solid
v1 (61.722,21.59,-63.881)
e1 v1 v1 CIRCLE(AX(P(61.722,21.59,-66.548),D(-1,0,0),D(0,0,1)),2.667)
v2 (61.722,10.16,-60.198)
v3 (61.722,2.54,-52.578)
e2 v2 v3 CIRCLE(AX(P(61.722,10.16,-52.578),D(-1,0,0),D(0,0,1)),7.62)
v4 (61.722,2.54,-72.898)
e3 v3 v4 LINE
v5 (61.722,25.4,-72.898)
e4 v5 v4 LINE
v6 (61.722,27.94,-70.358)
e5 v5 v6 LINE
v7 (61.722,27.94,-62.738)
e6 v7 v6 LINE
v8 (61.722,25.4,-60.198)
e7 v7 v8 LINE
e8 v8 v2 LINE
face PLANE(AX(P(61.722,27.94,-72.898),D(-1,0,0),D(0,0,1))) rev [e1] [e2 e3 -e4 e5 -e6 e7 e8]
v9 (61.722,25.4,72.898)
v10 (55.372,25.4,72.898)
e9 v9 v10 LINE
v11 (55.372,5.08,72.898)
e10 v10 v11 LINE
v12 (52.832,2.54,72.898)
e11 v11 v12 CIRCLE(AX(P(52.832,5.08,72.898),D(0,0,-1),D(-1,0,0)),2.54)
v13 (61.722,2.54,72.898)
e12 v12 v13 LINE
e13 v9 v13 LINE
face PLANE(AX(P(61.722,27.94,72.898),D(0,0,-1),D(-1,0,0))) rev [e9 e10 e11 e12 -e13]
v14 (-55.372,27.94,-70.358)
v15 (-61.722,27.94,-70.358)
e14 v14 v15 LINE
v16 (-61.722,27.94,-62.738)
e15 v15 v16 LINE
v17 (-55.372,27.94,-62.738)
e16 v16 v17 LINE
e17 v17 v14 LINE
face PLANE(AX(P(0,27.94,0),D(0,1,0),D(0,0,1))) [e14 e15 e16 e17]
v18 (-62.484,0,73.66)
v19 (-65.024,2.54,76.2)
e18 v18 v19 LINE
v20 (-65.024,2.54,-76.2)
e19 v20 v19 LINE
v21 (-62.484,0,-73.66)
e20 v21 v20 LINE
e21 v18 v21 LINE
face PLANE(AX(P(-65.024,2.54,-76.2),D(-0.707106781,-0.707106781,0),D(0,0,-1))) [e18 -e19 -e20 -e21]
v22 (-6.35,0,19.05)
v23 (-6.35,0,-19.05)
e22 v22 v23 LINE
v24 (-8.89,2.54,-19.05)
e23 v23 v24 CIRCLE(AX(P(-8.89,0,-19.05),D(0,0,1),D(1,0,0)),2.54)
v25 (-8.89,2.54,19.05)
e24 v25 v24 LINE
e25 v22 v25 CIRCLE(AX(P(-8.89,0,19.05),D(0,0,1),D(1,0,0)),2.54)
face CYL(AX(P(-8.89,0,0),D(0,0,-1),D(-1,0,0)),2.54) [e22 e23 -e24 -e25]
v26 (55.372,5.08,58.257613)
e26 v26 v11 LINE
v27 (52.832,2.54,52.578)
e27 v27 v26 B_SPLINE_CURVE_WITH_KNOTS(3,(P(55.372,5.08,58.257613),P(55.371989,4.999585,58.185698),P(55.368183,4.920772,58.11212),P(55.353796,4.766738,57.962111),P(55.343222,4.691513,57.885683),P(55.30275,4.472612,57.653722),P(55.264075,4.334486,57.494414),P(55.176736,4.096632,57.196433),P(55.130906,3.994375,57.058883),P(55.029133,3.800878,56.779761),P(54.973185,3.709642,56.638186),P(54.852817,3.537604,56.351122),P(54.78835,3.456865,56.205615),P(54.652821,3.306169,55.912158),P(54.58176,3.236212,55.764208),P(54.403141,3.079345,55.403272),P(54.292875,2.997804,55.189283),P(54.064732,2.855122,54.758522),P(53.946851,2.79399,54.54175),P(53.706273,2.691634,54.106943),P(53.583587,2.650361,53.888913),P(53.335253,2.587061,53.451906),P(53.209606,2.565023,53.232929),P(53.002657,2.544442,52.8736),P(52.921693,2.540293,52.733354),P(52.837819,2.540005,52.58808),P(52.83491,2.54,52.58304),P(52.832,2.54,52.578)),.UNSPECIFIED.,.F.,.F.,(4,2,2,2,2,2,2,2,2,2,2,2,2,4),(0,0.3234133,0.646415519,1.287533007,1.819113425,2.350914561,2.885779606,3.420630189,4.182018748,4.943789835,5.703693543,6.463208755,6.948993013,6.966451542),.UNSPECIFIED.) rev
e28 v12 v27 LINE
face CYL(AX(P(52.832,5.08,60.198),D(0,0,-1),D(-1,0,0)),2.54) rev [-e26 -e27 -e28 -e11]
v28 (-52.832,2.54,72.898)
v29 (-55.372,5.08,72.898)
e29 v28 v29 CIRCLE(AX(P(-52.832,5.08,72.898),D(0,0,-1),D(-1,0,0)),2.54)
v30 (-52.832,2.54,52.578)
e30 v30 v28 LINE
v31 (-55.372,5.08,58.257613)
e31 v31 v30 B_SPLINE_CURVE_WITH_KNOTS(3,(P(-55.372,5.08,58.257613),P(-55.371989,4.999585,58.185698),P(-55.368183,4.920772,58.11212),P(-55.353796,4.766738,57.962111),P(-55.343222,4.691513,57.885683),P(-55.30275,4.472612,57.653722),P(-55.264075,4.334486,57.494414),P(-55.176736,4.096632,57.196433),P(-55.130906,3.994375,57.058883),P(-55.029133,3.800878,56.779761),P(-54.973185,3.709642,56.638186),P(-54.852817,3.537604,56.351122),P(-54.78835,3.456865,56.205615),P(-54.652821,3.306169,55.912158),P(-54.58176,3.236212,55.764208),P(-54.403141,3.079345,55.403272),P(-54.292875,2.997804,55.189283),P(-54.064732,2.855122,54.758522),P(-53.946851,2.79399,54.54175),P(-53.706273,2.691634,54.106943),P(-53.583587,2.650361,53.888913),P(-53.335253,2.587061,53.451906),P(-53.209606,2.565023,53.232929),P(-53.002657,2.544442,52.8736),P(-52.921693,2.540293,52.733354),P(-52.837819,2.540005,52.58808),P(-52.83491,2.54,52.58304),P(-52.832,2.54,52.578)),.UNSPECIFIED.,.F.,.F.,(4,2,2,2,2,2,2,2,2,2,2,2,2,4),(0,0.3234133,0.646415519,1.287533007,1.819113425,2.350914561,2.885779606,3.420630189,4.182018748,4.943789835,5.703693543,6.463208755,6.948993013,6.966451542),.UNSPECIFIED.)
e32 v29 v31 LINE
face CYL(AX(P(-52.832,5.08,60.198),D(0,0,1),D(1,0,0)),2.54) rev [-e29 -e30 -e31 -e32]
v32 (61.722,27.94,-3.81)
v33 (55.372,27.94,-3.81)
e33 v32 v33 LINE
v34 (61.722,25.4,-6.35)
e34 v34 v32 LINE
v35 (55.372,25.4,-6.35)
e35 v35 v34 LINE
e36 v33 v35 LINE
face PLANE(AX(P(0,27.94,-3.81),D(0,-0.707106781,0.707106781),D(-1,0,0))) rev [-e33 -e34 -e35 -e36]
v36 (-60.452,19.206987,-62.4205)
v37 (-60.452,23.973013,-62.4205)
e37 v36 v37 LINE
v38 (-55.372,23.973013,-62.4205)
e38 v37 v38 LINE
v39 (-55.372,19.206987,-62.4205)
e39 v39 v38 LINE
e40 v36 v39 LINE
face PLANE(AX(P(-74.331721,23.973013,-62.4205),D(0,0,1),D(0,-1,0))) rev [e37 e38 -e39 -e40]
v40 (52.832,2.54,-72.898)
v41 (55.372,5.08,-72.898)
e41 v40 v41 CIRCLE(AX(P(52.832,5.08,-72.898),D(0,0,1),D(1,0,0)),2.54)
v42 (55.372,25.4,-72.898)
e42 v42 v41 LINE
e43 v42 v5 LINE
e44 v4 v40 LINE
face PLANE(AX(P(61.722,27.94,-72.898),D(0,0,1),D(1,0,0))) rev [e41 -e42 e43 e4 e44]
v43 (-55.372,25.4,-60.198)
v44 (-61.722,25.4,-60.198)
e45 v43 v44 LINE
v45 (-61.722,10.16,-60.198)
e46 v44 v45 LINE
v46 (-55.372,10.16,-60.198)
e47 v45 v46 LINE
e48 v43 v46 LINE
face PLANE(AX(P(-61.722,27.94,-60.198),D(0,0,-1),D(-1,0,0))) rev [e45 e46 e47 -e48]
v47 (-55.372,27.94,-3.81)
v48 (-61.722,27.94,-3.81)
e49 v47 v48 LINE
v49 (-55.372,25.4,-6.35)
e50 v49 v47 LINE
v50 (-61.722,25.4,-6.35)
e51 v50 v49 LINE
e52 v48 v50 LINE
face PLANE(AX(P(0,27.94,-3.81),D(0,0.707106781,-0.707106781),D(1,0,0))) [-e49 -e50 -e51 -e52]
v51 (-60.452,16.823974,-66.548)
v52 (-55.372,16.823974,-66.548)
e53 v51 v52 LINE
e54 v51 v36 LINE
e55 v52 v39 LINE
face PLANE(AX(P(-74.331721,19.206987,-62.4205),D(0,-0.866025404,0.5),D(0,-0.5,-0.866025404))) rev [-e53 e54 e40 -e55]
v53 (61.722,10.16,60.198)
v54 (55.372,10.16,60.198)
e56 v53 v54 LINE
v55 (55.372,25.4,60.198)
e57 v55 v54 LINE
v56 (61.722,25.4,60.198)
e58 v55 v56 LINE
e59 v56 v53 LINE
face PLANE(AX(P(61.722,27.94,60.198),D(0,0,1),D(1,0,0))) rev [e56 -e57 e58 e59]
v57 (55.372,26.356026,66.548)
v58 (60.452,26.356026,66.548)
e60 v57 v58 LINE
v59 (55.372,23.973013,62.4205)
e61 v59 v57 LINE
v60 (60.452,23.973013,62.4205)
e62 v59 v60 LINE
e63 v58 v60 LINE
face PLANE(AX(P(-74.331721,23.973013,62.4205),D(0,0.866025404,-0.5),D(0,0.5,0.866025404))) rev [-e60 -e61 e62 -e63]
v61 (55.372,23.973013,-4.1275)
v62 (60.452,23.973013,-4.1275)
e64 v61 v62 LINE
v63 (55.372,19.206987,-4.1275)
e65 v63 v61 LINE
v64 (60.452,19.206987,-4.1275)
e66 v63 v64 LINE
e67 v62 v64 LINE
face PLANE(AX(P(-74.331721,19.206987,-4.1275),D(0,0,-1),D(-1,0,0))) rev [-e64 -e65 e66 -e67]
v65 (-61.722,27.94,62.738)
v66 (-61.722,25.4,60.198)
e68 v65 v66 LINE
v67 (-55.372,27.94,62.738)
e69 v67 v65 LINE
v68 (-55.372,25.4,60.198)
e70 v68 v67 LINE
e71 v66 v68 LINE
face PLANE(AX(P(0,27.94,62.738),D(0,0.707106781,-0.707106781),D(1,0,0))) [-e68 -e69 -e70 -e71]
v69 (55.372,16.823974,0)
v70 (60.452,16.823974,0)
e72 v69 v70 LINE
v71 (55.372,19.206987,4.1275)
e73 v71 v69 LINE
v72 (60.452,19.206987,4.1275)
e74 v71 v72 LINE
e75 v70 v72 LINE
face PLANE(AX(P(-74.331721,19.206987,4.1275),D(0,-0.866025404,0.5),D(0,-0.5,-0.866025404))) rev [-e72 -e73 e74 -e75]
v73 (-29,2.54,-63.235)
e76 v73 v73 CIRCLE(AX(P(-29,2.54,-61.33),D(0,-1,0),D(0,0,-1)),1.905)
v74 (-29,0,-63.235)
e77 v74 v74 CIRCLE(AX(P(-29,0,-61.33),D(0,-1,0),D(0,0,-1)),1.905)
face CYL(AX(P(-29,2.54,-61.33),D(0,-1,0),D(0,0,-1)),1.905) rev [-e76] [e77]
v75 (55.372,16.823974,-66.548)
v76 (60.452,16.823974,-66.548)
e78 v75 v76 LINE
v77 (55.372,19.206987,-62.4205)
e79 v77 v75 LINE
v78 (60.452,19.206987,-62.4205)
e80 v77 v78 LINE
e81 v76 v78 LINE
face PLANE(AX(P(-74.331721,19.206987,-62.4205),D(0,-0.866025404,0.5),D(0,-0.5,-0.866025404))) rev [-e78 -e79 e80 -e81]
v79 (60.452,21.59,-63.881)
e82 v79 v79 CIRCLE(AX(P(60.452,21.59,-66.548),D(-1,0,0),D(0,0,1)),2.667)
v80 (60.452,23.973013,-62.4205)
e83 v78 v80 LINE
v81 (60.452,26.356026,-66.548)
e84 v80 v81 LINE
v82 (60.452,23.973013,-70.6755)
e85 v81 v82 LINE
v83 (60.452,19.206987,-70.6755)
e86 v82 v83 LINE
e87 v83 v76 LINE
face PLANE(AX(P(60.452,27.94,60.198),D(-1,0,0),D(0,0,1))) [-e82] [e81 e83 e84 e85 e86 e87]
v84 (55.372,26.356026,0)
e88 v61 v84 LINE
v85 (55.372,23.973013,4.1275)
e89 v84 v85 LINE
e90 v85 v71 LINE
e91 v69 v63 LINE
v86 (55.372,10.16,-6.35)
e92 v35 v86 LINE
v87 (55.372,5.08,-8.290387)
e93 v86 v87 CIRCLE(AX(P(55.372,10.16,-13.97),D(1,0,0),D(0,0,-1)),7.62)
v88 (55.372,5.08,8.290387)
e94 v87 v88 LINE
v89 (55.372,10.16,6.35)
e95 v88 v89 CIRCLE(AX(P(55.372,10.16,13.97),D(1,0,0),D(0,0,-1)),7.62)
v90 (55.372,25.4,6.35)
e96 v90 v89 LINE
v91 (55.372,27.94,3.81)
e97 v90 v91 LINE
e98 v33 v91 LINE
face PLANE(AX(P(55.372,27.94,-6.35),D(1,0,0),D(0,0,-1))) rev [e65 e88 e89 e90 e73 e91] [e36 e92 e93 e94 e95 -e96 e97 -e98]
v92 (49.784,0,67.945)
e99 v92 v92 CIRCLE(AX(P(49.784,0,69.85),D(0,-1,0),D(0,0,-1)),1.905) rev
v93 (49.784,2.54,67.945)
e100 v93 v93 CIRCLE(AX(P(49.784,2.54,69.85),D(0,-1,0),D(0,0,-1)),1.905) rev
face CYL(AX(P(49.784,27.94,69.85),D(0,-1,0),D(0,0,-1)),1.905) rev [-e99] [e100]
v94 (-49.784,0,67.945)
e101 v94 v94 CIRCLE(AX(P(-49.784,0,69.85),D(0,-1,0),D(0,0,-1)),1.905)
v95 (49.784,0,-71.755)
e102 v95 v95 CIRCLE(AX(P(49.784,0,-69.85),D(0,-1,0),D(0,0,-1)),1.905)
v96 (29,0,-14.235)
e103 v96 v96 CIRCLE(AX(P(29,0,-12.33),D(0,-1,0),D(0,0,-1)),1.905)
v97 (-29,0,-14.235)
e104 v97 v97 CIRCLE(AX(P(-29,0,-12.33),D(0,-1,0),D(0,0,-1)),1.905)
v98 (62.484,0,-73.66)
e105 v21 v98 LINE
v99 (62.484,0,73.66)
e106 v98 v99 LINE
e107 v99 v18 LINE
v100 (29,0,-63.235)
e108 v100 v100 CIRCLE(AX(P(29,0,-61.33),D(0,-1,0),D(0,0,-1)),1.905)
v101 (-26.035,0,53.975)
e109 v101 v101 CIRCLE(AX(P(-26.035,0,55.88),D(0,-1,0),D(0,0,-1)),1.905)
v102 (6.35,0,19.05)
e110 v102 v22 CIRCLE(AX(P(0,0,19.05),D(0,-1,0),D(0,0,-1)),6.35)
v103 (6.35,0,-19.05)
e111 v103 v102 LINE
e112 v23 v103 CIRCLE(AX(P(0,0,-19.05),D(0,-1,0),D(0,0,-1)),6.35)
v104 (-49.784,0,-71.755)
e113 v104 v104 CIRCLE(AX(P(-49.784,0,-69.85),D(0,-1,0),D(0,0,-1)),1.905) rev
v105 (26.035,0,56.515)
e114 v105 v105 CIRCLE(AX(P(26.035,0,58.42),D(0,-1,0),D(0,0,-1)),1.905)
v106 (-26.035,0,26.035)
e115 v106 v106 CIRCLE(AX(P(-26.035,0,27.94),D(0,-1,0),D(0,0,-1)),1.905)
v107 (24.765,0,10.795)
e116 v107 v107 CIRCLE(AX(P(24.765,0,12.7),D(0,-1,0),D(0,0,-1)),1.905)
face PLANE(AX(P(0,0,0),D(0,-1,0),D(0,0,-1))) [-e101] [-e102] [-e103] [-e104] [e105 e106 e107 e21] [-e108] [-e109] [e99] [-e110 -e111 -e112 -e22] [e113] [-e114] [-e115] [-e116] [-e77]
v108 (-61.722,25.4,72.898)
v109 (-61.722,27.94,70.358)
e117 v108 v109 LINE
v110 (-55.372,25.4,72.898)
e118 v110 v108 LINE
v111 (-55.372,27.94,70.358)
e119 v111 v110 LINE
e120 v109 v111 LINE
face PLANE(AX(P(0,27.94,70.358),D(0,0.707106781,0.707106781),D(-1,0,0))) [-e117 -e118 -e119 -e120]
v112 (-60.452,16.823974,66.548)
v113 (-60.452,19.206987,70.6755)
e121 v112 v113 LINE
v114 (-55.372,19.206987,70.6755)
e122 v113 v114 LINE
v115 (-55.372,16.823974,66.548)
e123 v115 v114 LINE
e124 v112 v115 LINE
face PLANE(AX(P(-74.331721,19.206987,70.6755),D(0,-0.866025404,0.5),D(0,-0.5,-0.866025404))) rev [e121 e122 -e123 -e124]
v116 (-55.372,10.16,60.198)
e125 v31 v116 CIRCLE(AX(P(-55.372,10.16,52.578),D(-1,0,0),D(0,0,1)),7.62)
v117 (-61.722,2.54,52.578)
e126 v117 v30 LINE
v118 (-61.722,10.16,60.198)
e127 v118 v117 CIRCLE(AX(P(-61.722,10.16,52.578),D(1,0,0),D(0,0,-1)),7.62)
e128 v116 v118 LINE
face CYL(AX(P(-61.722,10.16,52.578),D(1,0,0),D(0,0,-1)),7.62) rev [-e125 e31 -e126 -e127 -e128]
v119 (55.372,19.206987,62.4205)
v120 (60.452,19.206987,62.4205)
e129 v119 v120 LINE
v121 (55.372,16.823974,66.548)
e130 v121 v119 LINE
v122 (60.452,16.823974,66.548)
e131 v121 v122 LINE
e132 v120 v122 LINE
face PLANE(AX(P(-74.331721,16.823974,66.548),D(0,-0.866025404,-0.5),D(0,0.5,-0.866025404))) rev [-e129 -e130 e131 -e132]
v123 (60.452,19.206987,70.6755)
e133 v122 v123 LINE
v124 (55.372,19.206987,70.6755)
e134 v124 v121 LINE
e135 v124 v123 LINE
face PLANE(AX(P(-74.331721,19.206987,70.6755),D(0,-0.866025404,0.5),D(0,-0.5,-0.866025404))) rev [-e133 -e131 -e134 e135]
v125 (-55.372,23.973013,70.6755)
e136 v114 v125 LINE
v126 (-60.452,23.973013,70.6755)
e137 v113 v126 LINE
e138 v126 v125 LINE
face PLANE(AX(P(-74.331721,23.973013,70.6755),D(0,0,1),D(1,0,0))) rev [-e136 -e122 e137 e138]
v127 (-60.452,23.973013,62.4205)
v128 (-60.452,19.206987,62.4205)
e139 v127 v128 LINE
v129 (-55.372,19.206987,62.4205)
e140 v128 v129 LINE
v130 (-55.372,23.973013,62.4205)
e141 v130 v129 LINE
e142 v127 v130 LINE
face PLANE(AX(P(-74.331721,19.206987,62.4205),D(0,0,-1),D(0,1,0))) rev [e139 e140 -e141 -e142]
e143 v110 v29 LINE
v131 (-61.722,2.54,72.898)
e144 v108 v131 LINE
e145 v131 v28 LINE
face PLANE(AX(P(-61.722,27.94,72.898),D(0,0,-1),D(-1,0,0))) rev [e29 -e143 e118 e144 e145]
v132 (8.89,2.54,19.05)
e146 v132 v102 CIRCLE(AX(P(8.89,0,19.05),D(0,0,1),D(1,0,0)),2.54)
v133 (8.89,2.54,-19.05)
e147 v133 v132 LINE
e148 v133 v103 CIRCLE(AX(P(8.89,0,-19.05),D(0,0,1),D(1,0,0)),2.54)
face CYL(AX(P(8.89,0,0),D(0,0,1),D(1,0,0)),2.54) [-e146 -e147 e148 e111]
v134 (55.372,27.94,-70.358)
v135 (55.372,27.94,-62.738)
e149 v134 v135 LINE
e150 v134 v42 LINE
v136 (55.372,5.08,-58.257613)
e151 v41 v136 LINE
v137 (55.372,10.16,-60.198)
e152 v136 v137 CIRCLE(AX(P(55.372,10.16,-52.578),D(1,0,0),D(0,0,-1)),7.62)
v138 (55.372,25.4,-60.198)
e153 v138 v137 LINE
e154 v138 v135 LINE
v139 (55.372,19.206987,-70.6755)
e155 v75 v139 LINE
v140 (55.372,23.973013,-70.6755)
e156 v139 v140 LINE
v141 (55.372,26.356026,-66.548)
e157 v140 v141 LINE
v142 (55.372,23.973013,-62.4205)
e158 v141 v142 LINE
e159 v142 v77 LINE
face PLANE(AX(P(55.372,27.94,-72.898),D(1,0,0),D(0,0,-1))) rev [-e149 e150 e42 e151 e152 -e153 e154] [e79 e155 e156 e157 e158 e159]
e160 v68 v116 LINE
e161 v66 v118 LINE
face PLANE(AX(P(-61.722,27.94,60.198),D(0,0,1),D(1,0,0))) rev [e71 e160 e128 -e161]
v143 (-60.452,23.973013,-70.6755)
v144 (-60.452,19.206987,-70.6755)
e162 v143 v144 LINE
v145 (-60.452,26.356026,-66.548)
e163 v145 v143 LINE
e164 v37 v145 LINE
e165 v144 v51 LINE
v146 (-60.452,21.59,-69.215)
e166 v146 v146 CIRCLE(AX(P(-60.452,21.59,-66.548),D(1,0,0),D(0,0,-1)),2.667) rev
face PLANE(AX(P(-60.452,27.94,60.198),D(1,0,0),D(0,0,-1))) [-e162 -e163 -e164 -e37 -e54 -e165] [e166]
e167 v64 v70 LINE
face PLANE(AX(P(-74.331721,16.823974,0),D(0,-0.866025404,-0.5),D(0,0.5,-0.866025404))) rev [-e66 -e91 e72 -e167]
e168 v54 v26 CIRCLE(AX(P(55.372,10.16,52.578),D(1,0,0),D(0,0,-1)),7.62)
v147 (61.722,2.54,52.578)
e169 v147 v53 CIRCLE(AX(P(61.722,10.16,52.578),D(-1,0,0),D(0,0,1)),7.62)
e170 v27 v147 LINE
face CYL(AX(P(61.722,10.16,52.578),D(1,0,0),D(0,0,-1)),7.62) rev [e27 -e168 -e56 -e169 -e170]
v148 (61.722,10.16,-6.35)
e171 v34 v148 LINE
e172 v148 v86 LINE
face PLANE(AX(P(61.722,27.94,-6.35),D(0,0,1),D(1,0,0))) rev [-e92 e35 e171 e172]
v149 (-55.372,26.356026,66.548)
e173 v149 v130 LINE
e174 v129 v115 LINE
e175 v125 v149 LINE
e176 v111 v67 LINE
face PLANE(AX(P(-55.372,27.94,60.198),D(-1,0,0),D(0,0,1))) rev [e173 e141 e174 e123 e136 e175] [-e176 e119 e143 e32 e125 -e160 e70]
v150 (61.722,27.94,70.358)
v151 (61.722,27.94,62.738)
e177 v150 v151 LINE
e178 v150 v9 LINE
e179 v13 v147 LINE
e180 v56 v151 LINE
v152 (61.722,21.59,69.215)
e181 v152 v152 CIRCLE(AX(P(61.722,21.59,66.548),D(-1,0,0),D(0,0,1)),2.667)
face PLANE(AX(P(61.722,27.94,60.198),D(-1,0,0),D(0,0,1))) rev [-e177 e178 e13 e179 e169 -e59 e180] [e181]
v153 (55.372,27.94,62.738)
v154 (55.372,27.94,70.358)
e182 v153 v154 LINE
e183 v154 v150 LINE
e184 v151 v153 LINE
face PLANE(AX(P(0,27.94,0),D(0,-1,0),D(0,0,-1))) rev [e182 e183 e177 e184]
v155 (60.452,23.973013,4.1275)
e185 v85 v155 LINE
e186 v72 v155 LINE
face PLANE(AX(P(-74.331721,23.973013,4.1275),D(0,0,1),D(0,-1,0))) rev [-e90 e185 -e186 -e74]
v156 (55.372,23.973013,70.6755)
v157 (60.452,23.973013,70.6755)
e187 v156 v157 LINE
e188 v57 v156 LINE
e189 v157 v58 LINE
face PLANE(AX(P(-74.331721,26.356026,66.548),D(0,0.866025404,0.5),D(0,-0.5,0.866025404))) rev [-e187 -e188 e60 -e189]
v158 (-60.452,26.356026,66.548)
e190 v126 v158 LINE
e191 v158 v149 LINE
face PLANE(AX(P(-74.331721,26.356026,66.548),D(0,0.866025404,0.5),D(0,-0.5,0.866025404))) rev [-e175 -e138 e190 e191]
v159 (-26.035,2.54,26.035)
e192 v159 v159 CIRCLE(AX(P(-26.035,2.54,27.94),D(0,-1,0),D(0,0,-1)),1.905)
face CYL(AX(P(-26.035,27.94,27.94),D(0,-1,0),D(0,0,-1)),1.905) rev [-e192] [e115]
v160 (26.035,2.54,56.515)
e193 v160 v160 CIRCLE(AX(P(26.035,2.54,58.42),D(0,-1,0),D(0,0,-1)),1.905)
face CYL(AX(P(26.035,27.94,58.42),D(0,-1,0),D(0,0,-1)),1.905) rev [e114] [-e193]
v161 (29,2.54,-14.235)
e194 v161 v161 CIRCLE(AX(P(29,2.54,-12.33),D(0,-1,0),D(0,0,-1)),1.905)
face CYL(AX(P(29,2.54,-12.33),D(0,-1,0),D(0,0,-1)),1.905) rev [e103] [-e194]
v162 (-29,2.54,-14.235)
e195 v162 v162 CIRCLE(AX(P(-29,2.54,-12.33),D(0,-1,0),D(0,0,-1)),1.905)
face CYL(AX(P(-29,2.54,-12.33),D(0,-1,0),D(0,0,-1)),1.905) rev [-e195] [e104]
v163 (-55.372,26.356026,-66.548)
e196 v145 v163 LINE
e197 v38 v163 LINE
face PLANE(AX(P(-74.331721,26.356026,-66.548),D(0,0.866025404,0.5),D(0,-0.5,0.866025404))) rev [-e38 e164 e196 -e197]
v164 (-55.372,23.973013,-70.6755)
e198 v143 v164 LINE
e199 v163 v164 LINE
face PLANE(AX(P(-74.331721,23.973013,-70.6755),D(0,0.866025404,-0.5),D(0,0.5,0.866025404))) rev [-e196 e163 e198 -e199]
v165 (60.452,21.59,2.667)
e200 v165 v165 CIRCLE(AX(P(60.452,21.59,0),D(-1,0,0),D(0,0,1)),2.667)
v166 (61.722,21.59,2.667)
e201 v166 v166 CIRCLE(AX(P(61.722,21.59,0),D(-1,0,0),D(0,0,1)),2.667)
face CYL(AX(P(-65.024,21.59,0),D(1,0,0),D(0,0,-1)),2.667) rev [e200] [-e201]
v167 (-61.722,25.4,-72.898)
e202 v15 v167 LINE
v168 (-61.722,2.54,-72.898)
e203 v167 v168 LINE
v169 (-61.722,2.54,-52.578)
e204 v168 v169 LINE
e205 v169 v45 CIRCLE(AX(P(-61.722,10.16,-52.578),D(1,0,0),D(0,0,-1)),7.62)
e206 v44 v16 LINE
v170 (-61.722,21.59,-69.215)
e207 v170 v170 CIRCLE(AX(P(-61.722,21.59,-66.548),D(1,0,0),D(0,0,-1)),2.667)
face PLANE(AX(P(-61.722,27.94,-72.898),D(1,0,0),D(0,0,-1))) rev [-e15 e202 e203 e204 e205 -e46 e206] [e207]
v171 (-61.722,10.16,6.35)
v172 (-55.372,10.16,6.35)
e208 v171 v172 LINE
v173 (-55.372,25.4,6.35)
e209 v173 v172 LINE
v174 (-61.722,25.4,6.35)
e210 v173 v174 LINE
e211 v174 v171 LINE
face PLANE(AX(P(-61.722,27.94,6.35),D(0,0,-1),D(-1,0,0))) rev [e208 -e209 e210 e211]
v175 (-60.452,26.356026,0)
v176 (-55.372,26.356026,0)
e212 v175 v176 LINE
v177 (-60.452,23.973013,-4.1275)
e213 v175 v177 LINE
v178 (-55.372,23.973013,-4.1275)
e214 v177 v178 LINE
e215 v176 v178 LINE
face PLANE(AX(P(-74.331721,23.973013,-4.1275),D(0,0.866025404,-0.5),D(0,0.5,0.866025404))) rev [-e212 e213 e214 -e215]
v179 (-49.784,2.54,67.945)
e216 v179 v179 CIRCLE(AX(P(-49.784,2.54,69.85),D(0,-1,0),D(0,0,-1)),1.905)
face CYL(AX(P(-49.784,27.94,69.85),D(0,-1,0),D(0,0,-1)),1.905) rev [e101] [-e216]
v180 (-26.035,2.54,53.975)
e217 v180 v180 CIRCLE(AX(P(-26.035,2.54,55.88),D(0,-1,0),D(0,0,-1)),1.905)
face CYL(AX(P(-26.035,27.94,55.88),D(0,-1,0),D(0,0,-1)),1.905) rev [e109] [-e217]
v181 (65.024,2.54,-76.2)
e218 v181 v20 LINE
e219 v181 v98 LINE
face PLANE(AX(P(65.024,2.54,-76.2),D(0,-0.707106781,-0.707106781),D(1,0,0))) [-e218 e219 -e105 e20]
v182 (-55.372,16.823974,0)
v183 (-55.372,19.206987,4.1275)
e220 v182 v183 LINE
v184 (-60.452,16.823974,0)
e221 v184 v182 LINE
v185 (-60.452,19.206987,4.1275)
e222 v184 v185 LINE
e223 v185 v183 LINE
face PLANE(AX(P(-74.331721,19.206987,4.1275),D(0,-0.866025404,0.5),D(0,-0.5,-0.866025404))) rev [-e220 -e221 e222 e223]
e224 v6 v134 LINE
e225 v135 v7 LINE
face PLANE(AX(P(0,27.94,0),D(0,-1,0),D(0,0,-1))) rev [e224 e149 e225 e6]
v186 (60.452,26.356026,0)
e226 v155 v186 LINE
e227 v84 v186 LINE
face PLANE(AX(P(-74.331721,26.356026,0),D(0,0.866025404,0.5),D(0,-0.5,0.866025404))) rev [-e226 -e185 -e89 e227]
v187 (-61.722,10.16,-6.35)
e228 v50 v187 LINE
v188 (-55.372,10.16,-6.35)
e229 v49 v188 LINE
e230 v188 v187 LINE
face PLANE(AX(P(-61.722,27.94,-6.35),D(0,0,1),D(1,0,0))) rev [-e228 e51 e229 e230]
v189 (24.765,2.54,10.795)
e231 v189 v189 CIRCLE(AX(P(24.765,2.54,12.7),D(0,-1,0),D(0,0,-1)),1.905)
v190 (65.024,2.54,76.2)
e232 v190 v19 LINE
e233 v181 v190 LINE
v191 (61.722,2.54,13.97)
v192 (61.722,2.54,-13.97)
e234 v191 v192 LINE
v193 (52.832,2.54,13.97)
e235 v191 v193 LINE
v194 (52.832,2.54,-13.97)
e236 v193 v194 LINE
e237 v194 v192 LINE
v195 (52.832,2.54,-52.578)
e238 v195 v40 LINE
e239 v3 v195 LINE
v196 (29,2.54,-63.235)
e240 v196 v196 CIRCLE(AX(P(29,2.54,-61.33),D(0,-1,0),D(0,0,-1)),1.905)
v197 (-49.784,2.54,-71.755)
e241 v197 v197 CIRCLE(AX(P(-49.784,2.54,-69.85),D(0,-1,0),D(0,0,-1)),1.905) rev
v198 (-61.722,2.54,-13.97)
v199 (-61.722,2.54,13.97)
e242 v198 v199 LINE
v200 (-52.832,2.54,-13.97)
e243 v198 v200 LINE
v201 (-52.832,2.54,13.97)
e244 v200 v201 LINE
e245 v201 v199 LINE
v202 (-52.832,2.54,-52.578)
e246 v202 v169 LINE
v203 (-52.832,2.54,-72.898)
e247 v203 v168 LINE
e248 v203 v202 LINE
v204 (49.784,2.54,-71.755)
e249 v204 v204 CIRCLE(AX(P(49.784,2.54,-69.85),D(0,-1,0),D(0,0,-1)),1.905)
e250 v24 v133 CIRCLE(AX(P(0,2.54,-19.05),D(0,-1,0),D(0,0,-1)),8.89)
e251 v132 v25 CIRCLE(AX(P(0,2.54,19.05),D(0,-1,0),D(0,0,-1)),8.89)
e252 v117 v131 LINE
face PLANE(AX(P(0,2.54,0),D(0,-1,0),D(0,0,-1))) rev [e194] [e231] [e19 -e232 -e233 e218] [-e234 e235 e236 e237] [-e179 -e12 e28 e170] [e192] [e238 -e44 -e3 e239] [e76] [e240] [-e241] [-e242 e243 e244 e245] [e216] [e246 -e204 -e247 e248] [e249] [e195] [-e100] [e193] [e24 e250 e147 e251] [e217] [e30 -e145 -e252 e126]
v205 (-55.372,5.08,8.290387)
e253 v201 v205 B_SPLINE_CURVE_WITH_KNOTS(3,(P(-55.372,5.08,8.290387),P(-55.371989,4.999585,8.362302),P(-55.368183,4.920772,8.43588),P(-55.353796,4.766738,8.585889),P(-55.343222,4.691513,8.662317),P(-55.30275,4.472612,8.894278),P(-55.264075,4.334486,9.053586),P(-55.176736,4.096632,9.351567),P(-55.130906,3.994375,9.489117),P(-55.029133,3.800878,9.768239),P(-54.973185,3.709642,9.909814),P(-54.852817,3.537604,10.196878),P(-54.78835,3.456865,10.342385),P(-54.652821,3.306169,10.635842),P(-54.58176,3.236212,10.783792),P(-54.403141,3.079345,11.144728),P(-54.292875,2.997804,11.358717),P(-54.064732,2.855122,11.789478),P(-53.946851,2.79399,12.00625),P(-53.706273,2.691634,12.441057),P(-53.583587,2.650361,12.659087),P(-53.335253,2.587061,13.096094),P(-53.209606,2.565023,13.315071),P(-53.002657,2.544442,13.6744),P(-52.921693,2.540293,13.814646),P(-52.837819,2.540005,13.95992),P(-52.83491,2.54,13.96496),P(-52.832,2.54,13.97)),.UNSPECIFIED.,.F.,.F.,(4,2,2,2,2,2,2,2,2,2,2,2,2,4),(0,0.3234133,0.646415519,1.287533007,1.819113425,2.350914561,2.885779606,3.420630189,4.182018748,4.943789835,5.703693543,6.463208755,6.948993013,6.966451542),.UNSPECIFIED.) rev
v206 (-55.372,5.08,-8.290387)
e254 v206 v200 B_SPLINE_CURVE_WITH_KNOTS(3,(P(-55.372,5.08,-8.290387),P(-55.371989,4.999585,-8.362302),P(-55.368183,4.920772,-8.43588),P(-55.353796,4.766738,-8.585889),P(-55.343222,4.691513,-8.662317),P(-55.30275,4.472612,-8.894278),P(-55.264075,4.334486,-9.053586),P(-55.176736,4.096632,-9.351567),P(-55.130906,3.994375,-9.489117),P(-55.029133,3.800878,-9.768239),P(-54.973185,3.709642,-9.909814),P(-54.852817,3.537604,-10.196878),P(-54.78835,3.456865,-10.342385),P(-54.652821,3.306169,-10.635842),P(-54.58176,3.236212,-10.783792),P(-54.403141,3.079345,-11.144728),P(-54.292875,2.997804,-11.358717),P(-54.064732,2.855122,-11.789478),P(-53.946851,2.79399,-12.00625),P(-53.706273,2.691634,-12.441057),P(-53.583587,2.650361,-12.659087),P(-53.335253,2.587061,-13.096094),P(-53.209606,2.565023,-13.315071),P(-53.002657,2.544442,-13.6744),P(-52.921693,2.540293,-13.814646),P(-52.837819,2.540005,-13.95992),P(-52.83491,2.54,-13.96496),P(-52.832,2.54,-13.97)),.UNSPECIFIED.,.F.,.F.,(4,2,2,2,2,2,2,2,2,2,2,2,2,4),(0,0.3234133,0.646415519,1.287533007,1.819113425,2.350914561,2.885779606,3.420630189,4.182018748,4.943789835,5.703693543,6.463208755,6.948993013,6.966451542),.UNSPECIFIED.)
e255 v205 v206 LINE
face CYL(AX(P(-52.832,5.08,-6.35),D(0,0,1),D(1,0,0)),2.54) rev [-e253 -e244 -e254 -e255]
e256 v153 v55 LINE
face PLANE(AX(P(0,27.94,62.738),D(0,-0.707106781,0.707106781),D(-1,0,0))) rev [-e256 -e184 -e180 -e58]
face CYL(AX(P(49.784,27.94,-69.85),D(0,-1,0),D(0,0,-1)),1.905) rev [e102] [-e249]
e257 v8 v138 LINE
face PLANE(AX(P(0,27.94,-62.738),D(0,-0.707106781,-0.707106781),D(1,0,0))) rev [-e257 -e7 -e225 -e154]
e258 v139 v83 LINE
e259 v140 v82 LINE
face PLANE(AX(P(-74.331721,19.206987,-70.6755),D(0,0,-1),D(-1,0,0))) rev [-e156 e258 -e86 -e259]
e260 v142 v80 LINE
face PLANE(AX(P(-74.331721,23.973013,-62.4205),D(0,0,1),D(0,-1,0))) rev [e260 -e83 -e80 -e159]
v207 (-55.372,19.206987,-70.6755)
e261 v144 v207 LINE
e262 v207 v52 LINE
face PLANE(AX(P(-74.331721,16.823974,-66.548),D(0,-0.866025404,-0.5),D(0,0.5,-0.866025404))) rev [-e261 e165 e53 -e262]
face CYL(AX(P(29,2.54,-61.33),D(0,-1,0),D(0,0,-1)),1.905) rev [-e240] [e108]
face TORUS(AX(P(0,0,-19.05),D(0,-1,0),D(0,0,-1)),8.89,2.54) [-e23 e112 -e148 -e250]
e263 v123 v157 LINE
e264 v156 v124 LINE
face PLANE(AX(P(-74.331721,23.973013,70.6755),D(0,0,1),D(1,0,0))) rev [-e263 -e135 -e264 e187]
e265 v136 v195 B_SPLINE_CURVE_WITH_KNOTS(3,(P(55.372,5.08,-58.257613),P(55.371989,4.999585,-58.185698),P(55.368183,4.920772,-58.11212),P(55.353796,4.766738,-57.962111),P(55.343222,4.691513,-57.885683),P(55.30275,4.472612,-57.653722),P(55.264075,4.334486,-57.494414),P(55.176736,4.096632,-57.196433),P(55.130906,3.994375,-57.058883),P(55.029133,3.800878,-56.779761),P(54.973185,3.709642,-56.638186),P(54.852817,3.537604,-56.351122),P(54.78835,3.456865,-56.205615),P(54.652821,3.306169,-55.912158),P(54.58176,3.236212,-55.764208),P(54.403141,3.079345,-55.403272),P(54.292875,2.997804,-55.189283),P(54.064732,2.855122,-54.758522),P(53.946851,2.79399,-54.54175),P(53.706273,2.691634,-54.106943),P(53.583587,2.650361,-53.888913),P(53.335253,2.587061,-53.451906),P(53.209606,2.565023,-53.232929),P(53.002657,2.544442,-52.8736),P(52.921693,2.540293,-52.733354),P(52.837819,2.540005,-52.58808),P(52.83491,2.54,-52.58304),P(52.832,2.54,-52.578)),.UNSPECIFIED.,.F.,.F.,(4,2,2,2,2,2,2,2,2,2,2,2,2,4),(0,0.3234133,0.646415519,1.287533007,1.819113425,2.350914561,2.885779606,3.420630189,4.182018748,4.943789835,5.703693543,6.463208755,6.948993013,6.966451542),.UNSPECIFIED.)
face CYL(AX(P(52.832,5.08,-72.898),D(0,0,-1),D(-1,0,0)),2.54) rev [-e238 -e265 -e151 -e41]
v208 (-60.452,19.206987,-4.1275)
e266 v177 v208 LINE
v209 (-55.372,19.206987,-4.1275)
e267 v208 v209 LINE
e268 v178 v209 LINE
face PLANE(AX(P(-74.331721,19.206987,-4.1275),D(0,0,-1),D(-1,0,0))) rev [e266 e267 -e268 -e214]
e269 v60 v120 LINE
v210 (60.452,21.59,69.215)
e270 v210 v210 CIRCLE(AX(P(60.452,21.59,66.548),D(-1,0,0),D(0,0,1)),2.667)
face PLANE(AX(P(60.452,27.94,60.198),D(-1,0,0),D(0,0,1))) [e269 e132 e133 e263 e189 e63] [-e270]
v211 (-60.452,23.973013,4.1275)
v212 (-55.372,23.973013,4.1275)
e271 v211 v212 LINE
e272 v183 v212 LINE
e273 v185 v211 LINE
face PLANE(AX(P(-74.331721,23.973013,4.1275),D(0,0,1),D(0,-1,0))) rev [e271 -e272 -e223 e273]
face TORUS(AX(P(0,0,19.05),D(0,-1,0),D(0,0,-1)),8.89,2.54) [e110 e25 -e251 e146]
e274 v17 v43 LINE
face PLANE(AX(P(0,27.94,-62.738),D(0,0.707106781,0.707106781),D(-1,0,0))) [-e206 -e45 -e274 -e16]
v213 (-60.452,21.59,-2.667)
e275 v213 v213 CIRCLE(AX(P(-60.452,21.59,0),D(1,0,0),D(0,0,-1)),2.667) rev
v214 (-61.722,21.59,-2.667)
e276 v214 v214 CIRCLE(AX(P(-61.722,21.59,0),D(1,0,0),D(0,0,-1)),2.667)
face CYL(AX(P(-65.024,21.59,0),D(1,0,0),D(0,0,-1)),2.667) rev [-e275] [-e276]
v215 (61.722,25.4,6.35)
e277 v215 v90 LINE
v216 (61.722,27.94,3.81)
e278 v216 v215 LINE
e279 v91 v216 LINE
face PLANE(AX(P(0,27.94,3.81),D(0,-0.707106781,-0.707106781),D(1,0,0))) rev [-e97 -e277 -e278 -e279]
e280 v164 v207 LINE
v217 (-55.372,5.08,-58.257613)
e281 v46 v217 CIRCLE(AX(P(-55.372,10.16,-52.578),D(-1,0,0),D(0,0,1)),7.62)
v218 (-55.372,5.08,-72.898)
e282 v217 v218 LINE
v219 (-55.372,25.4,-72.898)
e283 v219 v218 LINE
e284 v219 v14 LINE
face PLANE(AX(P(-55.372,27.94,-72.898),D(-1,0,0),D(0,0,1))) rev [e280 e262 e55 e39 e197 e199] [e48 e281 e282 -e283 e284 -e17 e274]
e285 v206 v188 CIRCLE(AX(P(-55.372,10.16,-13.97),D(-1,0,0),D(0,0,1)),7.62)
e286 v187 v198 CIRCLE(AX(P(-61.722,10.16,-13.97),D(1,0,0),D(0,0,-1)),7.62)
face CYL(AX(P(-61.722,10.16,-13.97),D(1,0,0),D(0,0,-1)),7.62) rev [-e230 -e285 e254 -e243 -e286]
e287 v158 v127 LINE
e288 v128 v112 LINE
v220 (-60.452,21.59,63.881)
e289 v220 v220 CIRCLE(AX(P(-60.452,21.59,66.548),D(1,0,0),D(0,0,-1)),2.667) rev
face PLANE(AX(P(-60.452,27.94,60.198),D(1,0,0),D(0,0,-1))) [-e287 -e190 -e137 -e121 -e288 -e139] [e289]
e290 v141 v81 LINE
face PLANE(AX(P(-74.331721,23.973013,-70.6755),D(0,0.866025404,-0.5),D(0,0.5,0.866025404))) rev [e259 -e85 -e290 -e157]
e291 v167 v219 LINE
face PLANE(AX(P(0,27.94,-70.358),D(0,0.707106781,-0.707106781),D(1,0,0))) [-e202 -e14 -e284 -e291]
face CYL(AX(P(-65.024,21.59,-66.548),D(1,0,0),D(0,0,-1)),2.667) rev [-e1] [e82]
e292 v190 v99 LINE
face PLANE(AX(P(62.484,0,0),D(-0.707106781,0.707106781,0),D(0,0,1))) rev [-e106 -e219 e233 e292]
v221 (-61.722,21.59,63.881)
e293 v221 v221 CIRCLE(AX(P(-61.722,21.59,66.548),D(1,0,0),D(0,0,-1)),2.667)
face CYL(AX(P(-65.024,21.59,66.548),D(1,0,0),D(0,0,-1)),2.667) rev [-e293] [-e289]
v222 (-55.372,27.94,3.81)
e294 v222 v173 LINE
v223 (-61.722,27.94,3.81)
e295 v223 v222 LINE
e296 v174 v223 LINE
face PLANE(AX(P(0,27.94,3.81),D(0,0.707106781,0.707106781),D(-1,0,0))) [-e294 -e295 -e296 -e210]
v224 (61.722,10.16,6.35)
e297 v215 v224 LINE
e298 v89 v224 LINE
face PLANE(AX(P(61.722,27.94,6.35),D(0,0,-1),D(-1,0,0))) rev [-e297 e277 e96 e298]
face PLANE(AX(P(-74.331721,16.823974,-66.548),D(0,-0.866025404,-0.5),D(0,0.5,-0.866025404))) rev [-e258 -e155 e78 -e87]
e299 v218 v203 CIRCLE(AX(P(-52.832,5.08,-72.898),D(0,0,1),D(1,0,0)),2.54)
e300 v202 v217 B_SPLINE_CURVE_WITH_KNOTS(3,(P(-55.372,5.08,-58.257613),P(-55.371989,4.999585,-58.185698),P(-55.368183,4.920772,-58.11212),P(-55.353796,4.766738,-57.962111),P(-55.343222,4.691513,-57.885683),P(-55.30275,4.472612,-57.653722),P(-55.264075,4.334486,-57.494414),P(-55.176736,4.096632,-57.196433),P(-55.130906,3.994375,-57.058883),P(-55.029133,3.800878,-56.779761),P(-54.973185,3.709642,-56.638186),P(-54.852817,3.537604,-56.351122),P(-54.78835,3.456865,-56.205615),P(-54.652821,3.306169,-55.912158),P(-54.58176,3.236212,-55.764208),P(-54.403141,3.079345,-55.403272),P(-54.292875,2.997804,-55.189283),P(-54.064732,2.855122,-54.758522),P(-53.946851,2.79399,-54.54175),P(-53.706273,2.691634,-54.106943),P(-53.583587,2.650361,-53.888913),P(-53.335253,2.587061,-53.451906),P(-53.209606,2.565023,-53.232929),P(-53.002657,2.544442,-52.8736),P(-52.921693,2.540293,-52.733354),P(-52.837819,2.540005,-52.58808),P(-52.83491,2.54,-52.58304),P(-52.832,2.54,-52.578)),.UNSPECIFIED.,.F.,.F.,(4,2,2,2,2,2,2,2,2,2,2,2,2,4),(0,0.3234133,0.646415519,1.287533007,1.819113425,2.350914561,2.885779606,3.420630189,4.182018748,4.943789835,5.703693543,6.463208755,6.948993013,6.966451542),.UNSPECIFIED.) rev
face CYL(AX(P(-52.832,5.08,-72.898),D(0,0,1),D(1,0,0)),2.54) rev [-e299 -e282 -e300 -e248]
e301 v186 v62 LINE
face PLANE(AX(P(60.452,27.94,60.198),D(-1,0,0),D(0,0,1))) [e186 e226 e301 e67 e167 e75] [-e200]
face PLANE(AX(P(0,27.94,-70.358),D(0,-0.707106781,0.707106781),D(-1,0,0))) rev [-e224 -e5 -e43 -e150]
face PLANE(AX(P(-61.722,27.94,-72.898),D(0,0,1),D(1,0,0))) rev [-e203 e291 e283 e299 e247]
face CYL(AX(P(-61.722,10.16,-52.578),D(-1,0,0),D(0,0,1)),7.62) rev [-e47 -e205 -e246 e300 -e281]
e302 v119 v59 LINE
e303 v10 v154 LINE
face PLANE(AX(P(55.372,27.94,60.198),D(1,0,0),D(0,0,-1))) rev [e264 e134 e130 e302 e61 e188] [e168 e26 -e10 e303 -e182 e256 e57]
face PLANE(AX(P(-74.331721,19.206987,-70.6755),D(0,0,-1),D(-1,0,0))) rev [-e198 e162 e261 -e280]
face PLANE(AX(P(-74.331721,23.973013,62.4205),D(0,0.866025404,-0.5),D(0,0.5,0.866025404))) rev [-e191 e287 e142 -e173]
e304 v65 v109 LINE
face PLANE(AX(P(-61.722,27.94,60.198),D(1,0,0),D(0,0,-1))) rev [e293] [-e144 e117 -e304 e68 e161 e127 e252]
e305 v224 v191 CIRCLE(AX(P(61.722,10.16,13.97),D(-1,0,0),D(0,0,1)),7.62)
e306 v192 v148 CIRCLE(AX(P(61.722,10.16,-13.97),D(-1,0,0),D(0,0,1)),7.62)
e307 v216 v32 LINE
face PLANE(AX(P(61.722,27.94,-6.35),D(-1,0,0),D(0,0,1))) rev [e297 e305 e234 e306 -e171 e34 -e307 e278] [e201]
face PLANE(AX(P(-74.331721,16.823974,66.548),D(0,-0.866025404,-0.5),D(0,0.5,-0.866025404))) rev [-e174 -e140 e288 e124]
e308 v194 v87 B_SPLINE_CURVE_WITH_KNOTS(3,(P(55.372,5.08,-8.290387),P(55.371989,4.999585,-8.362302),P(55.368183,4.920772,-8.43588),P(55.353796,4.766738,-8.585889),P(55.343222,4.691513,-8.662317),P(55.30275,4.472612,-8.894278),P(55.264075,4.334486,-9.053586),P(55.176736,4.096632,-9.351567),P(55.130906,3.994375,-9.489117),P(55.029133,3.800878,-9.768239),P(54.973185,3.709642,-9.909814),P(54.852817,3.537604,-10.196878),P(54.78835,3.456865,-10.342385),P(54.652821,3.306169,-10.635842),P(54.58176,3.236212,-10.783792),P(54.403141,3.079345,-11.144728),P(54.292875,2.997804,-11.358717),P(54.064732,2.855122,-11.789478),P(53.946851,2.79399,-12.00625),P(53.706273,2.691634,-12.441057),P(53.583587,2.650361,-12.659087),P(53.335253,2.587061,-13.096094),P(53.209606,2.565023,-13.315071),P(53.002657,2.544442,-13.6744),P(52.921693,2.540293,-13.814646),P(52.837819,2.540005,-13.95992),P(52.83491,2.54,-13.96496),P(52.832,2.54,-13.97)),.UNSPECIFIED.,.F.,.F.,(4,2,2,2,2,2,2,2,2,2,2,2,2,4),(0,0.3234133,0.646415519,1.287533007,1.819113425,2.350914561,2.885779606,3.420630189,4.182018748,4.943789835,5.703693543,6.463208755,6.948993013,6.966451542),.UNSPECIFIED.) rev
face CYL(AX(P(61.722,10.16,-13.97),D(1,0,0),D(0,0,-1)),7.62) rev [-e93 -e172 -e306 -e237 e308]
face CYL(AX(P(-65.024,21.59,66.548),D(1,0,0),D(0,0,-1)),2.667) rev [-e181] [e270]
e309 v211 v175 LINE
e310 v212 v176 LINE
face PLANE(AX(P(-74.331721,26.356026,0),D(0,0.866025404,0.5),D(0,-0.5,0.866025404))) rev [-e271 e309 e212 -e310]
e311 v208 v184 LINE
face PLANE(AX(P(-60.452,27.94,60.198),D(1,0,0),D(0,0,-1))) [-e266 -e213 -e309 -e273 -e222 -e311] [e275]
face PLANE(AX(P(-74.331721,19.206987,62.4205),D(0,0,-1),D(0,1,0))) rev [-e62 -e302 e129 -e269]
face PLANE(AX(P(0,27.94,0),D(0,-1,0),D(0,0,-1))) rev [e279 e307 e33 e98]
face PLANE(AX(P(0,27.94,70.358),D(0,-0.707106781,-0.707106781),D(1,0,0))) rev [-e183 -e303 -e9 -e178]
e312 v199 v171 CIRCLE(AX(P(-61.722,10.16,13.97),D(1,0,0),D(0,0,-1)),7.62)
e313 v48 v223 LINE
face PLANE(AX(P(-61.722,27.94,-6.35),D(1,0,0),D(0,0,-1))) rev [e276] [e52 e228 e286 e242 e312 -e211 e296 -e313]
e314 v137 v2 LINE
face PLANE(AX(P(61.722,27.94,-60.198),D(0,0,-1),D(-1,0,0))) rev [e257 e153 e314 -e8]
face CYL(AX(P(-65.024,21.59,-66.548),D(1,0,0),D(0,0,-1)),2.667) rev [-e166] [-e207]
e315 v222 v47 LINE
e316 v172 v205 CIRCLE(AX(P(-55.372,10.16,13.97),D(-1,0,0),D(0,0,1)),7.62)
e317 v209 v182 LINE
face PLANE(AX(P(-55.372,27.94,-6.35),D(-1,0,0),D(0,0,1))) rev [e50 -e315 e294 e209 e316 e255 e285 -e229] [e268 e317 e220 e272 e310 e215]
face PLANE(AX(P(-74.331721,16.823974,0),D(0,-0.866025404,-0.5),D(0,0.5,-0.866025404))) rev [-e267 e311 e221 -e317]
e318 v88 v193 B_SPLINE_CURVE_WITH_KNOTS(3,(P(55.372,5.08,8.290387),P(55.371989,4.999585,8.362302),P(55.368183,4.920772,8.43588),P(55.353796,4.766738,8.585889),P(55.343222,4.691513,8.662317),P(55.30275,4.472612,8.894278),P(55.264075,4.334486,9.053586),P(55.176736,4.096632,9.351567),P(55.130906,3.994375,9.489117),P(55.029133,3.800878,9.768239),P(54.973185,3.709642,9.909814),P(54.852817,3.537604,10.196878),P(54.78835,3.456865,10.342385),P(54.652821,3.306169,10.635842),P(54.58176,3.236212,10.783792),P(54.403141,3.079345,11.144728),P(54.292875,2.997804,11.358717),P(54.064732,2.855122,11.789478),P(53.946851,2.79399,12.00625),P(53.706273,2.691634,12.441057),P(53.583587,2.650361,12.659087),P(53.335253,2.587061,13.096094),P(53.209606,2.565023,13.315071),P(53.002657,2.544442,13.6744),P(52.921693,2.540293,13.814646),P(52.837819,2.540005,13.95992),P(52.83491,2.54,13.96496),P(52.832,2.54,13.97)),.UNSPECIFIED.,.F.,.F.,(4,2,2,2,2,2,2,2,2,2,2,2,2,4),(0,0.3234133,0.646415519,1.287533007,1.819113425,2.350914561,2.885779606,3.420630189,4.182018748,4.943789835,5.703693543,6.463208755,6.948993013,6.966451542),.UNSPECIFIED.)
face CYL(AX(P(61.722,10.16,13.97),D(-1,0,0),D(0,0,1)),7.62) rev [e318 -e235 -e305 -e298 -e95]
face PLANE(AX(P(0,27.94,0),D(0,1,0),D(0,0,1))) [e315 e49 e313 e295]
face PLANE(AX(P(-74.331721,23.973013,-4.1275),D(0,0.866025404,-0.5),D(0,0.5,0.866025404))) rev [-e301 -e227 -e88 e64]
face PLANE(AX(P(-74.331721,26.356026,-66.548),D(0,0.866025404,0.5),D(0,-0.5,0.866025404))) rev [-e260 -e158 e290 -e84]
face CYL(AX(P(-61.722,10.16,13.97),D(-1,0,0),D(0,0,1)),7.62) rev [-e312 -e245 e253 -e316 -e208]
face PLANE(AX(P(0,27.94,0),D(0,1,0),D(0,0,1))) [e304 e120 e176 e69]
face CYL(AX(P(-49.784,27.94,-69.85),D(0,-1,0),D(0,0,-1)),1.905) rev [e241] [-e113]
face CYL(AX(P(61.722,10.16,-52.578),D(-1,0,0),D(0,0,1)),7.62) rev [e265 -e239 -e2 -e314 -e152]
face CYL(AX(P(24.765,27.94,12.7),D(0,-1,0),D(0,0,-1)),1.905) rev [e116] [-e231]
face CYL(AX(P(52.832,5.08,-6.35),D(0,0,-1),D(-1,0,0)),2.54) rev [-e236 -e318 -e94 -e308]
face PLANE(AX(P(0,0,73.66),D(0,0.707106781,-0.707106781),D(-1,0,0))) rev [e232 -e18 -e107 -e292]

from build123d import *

# Parameters (mm, degrees)
SKETCH1_W               = 130.048
SKETCH1_H               = 152.4
BOSS_EXTRUDE1_DEPTH     = 2.54
CHAMFER1_SIZE           = 2.54
SKETCH4_W               = 6.35
SKETCH4_H               = 12.7
BOSS_EXTRUDE4_DEPTH     = 25.4
CUT_EXTRUDE2_DEPTH      = 104.996173853
CUT_EXTRUDE2_DEPTH_BACK = 104.996173853
SKETCH5_R               = 2.667
CUT_EXTRUDE3_DEPTH      = 60.452
CUT_EXTRUDE3_DEPTH_BACK = 60.452
SKETCH5_3_R             = 2.667
FILLET1_R               = 7.62
FILLET2_R               = 2.54
CHAMFER2_SIZE           = 2.54
SKETCH6_R               = 1.905
CUT_EXTRUDE4_DEPTH      = 104.996173853
SKETCH8_R               = 1.905
CUT_EXTRUDE5_DEPTH      = 2.54
SKETCH9_R               = 1.905
CUT_EXTRUDE6_DEPTH      = 104.996173853
CUT_EXTRUDE7_DEPTH      = 104.996173853
FILLET3_R               = 2.54


with BuildPart() as part:
    # Sketch1 → Boss-Extrude1 (new body)
    with BuildSketch(Plane(origin=(0, 0, 0), x_dir=(1, 0, 0), z_dir=(0, 1, 0))):
        Rectangle(SKETCH1_W, SKETCH1_H)
    extrude(amount=BOSS_EXTRUDE1_DEPTH)

    # Chamfer1
    chamfer1_edges = [part.edges().sort_by_distance(p)[0] for p in [
        (0, 0, -76.2),
        (-65.024, 0, 0),
        (0, 0, 76.2),
        (65.024, 0, 0),
    ]]
    chamfer(chamfer1_edges, length=CHAMFER1_SIZE - 0.0001)  # a hair under: the kernel refuses the full size

    # Sketch4 → Boss-Extrude4 (add)
    with BuildSketch(Plane(origin=(0, 2.54, 0), x_dir=(1, 0, 0), z_dir=(0, 1, 0))):
        with Locations((-58.547, 66.548)):
            Rectangle(SKETCH4_W, SKETCH4_H)
        with Locations((-58.547, 0)):
            Rectangle(SKETCH4_W, SKETCH4_H)
        with Locations((-58.547, -66.548)):
            Rectangle(SKETCH4_W, SKETCH4_H)
        with Locations((58.547, -66.548)):
            Rectangle(SKETCH4_W, SKETCH4_H)
        with Locations((58.547, 0)):
            Rectangle(SKETCH4_W, SKETCH4_H)
        with Locations((58.547, 66.548)):
            Rectangle(SKETCH4_W, SKETCH4_H)
    extrude(amount=BOSS_EXTRUDE4_DEPTH)

    # Sketch5 → Cut-Extrude2 (cut, two sides: drawn at the far end of the back side and taken through both)
    with BuildSketch(Plane(origin=(0, 0, 0), x_dir=(0, 0, -1), z_dir=(1, 0, 0)).offset(-CUT_EXTRUDE2_DEPTH_BACK)):
        with Locations((-66.548, 21.59)):
            Circle(SKETCH5_R)
        with Locations((0, 21.59)):
            Circle(SKETCH5_R)
        with Locations((66.548, 21.59)):
            Circle(SKETCH5_R)
    extrude(amount=CUT_EXTRUDE2_DEPTH + CUT_EXTRUDE2_DEPTH_BACK, mode=Mode.SUBTRACT)

    # Sketch5<3> → Cut-Extrude3 (cut, two sides: drawn at the far end of the back side and taken through both)
    # profile 1 of 3: a face of its own
    with BuildSketch(Plane(origin=(0, 0, 0), x_dir=(0, 0, -1), z_dir=(1, 0, 0)).offset(-CUT_EXTRUDE3_DEPTH_BACK)):
        Polygon((0, 16.823973528), (4.1275, 19.206986764), (4.1275, 23.973013236), (0, 26.356026472), (-4.1275, 23.973013236), (-4.1275, 19.206986764), align=None)
        with Locations(Location((0, 21.59, 0), (0, 0, 180))):
            Circle(SKETCH5_3_R, mode=Mode.SUBTRACT)
    # profile 2 of 3: a face of its own
    with BuildSketch(Plane(origin=(0, 0, 0), x_dir=(0, 0, -1), z_dir=(1, 0, 0)).offset(-CUT_EXTRUDE3_DEPTH_BACK)):
        Polygon((-66.548, 16.823973528), (-62.4205, 19.206986764), (-62.4205, 23.973013236), (-66.548, 26.356026472), (-70.6755, 23.973013236), (-70.6755, 19.206986764), align=None)
        with Locations(Location((-66.548, 21.59, 0), (0, 0, 180))):
            Circle(SKETCH5_3_R, mode=Mode.SUBTRACT)
    # profile 3 of 3: a face of its own
    with BuildSketch(Plane(origin=(0, 0, 0), x_dir=(0, 0, -1), z_dir=(1, 0, 0)).offset(-CUT_EXTRUDE3_DEPTH_BACK)):
        Polygon((66.548, 16.823973528), (70.6755, 19.206986764), (70.6755, 23.973013236), (66.548, 26.356026472), (62.4205, 23.973013236), (62.4205, 19.206986764), align=None)
        with Locations(Location((66.548, 21.59, 0), (0, 0, 180))):
            Circle(SKETCH5_3_R, mode=Mode.SUBTRACT)
    extrude(amount=CUT_EXTRUDE3_DEPTH + CUT_EXTRUDE3_DEPTH_BACK, mode=Mode.SUBTRACT)

    # Fillet1
    fillet1_edges = [part.edges().sort_by_distance(p)[0] for p in [
        (-58.547, 2.54, -60.198),
        (-58.547, 2.54, 6.35),
        (-58.547, 2.54, -6.35),
        (-58.547, 2.54, 60.198),
        (58.547, 2.54, 60.198),
        (58.547, 2.54, -6.35),
        (58.547, 2.54, 6.35),
        (58.547, 2.54, -60.198),
    ]]
    fillet(fillet1_edges, radius=FILLET1_R)

    # Fillet2
    fillet2_edges = [part.edges().sort_by_distance(p)[0] for p in [
        (-55.372, 2.54, -62.738),
        (-55.372, 2.54, 0),
        (-55.372, 2.54, 62.738),
        (55.372, 2.54, 62.738),
        (55.372, 2.54, 0),
        (55.372, 2.54, -62.738),
    ]]
    fillet(fillet2_edges, radius=FILLET2_R)

    # Chamfer2
    chamfer2_edges = [part.edges().sort_by_distance(p)[0] for p in [
        (-58.547, 27.94, -60.198),
        (-58.547, 27.94, -72.898),
        (-58.547, 27.94, 6.35),
        (-58.547, 27.94, -6.35),
        (-58.547, 27.94, 72.898),
        (-58.547, 27.94, 60.198),
        (58.547, 27.94, 60.198),
        (58.547, 27.94, 72.898),
        (58.547, 27.94, -6.35),
        (58.547, 27.94, 6.35),
        (58.547, 27.94, -72.898),
        (58.547, 27.94, -60.198),
    ]]
    chamfer(chamfer2_edges, length=CHAMFER2_SIZE)

    # Sketch6 → Cut-Extrude4 (cut, through all)
    with BuildSketch(Plane.XZ):
        with Locations(Location((26.035, 58.42, 0), (0, 0, 270))):
            Circle(SKETCH6_R)
        with Locations(Location((24.765, 12.7, 0), (0, 0, 270))):
            Circle(SKETCH6_R)
        with Locations(Location((-26.035, 55.88, 0), (0, 0, 270))):
            Circle(SKETCH6_R)
        with Locations(Location((-26.035, 27.94, 0), (0, 0, 270))):
            Circle(SKETCH6_R)
    extrude(amount=-CUT_EXTRUDE4_DEPTH, mode=Mode.SUBTRACT)

    # Sketch8 → Cut-Extrude5 (cut)
    with BuildSketch(Plane.XZ):
        with Locations(Location((29, -12.33, 0), (0, 0, 270))):
            Circle(SKETCH8_R)
        with Locations(Location((29, -61.33, 0), (0, 0, 270))):
            Circle(SKETCH8_R)
        with Locations(Location((-29, -61.33, 0), (0, 0, 270))):
            Circle(SKETCH8_R)
        with Locations(Location((-29, -12.33, 0), (0, 0, 270))):
            Circle(SKETCH8_R)
    extrude(amount=-CUT_EXTRUDE5_DEPTH, mode=Mode.SUBTRACT)

    # Sketch9 → Cut-Extrude6 (cut, through all)
    with BuildSketch(Plane.XZ):
        with Locations(Location((-49.784, -69.85, 0), (0, 0, 270))):
            Circle(SKETCH9_R)
        with Locations(Location((-49.784, 69.85, 0), (0, 0, 270))):
            Circle(SKETCH9_R)
        with Locations(Location((49.784, 69.85, 0), (0, 0, 270))):
            Circle(SKETCH9_R)
        with Locations(Location((49.784, -69.85, 0), (0, 0, 270))):
            Circle(SKETCH9_R)
    extrude(amount=-CUT_EXTRUDE6_DEPTH, mode=Mode.SUBTRACT)

    # Sketch10 → Cut-Extrude7 (cut, through all)
    with BuildSketch(Plane.XZ):
        with BuildLine():
            Line((-6.35, -19.05), (-6.35, 19.05))
            ThreePointArc((-6.35, 19.05), (0, 25.4), (6.35, 19.05))
            Line((6.35, 19.05), (6.35, -19.05))
            ThreePointArc((6.35, -19.05), (0, -25.4), (-6.35, -19.05))
        make_face()
    extrude(amount=-CUT_EXTRUDE7_DEPTH, mode=Mode.SUBTRACT)

    # Fillet3
    fillet3_edges = [part.edges().sort_by_distance(p)[0] for p in [
        (0, 2.54, 25.4),
        (6.35, 2.54, 0),
        (0, 2.54, -25.4),
        (-6.35, 2.54, 0),
    ]]
    fillet(fillet3_edges, radius=FILLET3_R - 0.0001)  # a hair under: the kernel refuses the full size


solid = part.part
